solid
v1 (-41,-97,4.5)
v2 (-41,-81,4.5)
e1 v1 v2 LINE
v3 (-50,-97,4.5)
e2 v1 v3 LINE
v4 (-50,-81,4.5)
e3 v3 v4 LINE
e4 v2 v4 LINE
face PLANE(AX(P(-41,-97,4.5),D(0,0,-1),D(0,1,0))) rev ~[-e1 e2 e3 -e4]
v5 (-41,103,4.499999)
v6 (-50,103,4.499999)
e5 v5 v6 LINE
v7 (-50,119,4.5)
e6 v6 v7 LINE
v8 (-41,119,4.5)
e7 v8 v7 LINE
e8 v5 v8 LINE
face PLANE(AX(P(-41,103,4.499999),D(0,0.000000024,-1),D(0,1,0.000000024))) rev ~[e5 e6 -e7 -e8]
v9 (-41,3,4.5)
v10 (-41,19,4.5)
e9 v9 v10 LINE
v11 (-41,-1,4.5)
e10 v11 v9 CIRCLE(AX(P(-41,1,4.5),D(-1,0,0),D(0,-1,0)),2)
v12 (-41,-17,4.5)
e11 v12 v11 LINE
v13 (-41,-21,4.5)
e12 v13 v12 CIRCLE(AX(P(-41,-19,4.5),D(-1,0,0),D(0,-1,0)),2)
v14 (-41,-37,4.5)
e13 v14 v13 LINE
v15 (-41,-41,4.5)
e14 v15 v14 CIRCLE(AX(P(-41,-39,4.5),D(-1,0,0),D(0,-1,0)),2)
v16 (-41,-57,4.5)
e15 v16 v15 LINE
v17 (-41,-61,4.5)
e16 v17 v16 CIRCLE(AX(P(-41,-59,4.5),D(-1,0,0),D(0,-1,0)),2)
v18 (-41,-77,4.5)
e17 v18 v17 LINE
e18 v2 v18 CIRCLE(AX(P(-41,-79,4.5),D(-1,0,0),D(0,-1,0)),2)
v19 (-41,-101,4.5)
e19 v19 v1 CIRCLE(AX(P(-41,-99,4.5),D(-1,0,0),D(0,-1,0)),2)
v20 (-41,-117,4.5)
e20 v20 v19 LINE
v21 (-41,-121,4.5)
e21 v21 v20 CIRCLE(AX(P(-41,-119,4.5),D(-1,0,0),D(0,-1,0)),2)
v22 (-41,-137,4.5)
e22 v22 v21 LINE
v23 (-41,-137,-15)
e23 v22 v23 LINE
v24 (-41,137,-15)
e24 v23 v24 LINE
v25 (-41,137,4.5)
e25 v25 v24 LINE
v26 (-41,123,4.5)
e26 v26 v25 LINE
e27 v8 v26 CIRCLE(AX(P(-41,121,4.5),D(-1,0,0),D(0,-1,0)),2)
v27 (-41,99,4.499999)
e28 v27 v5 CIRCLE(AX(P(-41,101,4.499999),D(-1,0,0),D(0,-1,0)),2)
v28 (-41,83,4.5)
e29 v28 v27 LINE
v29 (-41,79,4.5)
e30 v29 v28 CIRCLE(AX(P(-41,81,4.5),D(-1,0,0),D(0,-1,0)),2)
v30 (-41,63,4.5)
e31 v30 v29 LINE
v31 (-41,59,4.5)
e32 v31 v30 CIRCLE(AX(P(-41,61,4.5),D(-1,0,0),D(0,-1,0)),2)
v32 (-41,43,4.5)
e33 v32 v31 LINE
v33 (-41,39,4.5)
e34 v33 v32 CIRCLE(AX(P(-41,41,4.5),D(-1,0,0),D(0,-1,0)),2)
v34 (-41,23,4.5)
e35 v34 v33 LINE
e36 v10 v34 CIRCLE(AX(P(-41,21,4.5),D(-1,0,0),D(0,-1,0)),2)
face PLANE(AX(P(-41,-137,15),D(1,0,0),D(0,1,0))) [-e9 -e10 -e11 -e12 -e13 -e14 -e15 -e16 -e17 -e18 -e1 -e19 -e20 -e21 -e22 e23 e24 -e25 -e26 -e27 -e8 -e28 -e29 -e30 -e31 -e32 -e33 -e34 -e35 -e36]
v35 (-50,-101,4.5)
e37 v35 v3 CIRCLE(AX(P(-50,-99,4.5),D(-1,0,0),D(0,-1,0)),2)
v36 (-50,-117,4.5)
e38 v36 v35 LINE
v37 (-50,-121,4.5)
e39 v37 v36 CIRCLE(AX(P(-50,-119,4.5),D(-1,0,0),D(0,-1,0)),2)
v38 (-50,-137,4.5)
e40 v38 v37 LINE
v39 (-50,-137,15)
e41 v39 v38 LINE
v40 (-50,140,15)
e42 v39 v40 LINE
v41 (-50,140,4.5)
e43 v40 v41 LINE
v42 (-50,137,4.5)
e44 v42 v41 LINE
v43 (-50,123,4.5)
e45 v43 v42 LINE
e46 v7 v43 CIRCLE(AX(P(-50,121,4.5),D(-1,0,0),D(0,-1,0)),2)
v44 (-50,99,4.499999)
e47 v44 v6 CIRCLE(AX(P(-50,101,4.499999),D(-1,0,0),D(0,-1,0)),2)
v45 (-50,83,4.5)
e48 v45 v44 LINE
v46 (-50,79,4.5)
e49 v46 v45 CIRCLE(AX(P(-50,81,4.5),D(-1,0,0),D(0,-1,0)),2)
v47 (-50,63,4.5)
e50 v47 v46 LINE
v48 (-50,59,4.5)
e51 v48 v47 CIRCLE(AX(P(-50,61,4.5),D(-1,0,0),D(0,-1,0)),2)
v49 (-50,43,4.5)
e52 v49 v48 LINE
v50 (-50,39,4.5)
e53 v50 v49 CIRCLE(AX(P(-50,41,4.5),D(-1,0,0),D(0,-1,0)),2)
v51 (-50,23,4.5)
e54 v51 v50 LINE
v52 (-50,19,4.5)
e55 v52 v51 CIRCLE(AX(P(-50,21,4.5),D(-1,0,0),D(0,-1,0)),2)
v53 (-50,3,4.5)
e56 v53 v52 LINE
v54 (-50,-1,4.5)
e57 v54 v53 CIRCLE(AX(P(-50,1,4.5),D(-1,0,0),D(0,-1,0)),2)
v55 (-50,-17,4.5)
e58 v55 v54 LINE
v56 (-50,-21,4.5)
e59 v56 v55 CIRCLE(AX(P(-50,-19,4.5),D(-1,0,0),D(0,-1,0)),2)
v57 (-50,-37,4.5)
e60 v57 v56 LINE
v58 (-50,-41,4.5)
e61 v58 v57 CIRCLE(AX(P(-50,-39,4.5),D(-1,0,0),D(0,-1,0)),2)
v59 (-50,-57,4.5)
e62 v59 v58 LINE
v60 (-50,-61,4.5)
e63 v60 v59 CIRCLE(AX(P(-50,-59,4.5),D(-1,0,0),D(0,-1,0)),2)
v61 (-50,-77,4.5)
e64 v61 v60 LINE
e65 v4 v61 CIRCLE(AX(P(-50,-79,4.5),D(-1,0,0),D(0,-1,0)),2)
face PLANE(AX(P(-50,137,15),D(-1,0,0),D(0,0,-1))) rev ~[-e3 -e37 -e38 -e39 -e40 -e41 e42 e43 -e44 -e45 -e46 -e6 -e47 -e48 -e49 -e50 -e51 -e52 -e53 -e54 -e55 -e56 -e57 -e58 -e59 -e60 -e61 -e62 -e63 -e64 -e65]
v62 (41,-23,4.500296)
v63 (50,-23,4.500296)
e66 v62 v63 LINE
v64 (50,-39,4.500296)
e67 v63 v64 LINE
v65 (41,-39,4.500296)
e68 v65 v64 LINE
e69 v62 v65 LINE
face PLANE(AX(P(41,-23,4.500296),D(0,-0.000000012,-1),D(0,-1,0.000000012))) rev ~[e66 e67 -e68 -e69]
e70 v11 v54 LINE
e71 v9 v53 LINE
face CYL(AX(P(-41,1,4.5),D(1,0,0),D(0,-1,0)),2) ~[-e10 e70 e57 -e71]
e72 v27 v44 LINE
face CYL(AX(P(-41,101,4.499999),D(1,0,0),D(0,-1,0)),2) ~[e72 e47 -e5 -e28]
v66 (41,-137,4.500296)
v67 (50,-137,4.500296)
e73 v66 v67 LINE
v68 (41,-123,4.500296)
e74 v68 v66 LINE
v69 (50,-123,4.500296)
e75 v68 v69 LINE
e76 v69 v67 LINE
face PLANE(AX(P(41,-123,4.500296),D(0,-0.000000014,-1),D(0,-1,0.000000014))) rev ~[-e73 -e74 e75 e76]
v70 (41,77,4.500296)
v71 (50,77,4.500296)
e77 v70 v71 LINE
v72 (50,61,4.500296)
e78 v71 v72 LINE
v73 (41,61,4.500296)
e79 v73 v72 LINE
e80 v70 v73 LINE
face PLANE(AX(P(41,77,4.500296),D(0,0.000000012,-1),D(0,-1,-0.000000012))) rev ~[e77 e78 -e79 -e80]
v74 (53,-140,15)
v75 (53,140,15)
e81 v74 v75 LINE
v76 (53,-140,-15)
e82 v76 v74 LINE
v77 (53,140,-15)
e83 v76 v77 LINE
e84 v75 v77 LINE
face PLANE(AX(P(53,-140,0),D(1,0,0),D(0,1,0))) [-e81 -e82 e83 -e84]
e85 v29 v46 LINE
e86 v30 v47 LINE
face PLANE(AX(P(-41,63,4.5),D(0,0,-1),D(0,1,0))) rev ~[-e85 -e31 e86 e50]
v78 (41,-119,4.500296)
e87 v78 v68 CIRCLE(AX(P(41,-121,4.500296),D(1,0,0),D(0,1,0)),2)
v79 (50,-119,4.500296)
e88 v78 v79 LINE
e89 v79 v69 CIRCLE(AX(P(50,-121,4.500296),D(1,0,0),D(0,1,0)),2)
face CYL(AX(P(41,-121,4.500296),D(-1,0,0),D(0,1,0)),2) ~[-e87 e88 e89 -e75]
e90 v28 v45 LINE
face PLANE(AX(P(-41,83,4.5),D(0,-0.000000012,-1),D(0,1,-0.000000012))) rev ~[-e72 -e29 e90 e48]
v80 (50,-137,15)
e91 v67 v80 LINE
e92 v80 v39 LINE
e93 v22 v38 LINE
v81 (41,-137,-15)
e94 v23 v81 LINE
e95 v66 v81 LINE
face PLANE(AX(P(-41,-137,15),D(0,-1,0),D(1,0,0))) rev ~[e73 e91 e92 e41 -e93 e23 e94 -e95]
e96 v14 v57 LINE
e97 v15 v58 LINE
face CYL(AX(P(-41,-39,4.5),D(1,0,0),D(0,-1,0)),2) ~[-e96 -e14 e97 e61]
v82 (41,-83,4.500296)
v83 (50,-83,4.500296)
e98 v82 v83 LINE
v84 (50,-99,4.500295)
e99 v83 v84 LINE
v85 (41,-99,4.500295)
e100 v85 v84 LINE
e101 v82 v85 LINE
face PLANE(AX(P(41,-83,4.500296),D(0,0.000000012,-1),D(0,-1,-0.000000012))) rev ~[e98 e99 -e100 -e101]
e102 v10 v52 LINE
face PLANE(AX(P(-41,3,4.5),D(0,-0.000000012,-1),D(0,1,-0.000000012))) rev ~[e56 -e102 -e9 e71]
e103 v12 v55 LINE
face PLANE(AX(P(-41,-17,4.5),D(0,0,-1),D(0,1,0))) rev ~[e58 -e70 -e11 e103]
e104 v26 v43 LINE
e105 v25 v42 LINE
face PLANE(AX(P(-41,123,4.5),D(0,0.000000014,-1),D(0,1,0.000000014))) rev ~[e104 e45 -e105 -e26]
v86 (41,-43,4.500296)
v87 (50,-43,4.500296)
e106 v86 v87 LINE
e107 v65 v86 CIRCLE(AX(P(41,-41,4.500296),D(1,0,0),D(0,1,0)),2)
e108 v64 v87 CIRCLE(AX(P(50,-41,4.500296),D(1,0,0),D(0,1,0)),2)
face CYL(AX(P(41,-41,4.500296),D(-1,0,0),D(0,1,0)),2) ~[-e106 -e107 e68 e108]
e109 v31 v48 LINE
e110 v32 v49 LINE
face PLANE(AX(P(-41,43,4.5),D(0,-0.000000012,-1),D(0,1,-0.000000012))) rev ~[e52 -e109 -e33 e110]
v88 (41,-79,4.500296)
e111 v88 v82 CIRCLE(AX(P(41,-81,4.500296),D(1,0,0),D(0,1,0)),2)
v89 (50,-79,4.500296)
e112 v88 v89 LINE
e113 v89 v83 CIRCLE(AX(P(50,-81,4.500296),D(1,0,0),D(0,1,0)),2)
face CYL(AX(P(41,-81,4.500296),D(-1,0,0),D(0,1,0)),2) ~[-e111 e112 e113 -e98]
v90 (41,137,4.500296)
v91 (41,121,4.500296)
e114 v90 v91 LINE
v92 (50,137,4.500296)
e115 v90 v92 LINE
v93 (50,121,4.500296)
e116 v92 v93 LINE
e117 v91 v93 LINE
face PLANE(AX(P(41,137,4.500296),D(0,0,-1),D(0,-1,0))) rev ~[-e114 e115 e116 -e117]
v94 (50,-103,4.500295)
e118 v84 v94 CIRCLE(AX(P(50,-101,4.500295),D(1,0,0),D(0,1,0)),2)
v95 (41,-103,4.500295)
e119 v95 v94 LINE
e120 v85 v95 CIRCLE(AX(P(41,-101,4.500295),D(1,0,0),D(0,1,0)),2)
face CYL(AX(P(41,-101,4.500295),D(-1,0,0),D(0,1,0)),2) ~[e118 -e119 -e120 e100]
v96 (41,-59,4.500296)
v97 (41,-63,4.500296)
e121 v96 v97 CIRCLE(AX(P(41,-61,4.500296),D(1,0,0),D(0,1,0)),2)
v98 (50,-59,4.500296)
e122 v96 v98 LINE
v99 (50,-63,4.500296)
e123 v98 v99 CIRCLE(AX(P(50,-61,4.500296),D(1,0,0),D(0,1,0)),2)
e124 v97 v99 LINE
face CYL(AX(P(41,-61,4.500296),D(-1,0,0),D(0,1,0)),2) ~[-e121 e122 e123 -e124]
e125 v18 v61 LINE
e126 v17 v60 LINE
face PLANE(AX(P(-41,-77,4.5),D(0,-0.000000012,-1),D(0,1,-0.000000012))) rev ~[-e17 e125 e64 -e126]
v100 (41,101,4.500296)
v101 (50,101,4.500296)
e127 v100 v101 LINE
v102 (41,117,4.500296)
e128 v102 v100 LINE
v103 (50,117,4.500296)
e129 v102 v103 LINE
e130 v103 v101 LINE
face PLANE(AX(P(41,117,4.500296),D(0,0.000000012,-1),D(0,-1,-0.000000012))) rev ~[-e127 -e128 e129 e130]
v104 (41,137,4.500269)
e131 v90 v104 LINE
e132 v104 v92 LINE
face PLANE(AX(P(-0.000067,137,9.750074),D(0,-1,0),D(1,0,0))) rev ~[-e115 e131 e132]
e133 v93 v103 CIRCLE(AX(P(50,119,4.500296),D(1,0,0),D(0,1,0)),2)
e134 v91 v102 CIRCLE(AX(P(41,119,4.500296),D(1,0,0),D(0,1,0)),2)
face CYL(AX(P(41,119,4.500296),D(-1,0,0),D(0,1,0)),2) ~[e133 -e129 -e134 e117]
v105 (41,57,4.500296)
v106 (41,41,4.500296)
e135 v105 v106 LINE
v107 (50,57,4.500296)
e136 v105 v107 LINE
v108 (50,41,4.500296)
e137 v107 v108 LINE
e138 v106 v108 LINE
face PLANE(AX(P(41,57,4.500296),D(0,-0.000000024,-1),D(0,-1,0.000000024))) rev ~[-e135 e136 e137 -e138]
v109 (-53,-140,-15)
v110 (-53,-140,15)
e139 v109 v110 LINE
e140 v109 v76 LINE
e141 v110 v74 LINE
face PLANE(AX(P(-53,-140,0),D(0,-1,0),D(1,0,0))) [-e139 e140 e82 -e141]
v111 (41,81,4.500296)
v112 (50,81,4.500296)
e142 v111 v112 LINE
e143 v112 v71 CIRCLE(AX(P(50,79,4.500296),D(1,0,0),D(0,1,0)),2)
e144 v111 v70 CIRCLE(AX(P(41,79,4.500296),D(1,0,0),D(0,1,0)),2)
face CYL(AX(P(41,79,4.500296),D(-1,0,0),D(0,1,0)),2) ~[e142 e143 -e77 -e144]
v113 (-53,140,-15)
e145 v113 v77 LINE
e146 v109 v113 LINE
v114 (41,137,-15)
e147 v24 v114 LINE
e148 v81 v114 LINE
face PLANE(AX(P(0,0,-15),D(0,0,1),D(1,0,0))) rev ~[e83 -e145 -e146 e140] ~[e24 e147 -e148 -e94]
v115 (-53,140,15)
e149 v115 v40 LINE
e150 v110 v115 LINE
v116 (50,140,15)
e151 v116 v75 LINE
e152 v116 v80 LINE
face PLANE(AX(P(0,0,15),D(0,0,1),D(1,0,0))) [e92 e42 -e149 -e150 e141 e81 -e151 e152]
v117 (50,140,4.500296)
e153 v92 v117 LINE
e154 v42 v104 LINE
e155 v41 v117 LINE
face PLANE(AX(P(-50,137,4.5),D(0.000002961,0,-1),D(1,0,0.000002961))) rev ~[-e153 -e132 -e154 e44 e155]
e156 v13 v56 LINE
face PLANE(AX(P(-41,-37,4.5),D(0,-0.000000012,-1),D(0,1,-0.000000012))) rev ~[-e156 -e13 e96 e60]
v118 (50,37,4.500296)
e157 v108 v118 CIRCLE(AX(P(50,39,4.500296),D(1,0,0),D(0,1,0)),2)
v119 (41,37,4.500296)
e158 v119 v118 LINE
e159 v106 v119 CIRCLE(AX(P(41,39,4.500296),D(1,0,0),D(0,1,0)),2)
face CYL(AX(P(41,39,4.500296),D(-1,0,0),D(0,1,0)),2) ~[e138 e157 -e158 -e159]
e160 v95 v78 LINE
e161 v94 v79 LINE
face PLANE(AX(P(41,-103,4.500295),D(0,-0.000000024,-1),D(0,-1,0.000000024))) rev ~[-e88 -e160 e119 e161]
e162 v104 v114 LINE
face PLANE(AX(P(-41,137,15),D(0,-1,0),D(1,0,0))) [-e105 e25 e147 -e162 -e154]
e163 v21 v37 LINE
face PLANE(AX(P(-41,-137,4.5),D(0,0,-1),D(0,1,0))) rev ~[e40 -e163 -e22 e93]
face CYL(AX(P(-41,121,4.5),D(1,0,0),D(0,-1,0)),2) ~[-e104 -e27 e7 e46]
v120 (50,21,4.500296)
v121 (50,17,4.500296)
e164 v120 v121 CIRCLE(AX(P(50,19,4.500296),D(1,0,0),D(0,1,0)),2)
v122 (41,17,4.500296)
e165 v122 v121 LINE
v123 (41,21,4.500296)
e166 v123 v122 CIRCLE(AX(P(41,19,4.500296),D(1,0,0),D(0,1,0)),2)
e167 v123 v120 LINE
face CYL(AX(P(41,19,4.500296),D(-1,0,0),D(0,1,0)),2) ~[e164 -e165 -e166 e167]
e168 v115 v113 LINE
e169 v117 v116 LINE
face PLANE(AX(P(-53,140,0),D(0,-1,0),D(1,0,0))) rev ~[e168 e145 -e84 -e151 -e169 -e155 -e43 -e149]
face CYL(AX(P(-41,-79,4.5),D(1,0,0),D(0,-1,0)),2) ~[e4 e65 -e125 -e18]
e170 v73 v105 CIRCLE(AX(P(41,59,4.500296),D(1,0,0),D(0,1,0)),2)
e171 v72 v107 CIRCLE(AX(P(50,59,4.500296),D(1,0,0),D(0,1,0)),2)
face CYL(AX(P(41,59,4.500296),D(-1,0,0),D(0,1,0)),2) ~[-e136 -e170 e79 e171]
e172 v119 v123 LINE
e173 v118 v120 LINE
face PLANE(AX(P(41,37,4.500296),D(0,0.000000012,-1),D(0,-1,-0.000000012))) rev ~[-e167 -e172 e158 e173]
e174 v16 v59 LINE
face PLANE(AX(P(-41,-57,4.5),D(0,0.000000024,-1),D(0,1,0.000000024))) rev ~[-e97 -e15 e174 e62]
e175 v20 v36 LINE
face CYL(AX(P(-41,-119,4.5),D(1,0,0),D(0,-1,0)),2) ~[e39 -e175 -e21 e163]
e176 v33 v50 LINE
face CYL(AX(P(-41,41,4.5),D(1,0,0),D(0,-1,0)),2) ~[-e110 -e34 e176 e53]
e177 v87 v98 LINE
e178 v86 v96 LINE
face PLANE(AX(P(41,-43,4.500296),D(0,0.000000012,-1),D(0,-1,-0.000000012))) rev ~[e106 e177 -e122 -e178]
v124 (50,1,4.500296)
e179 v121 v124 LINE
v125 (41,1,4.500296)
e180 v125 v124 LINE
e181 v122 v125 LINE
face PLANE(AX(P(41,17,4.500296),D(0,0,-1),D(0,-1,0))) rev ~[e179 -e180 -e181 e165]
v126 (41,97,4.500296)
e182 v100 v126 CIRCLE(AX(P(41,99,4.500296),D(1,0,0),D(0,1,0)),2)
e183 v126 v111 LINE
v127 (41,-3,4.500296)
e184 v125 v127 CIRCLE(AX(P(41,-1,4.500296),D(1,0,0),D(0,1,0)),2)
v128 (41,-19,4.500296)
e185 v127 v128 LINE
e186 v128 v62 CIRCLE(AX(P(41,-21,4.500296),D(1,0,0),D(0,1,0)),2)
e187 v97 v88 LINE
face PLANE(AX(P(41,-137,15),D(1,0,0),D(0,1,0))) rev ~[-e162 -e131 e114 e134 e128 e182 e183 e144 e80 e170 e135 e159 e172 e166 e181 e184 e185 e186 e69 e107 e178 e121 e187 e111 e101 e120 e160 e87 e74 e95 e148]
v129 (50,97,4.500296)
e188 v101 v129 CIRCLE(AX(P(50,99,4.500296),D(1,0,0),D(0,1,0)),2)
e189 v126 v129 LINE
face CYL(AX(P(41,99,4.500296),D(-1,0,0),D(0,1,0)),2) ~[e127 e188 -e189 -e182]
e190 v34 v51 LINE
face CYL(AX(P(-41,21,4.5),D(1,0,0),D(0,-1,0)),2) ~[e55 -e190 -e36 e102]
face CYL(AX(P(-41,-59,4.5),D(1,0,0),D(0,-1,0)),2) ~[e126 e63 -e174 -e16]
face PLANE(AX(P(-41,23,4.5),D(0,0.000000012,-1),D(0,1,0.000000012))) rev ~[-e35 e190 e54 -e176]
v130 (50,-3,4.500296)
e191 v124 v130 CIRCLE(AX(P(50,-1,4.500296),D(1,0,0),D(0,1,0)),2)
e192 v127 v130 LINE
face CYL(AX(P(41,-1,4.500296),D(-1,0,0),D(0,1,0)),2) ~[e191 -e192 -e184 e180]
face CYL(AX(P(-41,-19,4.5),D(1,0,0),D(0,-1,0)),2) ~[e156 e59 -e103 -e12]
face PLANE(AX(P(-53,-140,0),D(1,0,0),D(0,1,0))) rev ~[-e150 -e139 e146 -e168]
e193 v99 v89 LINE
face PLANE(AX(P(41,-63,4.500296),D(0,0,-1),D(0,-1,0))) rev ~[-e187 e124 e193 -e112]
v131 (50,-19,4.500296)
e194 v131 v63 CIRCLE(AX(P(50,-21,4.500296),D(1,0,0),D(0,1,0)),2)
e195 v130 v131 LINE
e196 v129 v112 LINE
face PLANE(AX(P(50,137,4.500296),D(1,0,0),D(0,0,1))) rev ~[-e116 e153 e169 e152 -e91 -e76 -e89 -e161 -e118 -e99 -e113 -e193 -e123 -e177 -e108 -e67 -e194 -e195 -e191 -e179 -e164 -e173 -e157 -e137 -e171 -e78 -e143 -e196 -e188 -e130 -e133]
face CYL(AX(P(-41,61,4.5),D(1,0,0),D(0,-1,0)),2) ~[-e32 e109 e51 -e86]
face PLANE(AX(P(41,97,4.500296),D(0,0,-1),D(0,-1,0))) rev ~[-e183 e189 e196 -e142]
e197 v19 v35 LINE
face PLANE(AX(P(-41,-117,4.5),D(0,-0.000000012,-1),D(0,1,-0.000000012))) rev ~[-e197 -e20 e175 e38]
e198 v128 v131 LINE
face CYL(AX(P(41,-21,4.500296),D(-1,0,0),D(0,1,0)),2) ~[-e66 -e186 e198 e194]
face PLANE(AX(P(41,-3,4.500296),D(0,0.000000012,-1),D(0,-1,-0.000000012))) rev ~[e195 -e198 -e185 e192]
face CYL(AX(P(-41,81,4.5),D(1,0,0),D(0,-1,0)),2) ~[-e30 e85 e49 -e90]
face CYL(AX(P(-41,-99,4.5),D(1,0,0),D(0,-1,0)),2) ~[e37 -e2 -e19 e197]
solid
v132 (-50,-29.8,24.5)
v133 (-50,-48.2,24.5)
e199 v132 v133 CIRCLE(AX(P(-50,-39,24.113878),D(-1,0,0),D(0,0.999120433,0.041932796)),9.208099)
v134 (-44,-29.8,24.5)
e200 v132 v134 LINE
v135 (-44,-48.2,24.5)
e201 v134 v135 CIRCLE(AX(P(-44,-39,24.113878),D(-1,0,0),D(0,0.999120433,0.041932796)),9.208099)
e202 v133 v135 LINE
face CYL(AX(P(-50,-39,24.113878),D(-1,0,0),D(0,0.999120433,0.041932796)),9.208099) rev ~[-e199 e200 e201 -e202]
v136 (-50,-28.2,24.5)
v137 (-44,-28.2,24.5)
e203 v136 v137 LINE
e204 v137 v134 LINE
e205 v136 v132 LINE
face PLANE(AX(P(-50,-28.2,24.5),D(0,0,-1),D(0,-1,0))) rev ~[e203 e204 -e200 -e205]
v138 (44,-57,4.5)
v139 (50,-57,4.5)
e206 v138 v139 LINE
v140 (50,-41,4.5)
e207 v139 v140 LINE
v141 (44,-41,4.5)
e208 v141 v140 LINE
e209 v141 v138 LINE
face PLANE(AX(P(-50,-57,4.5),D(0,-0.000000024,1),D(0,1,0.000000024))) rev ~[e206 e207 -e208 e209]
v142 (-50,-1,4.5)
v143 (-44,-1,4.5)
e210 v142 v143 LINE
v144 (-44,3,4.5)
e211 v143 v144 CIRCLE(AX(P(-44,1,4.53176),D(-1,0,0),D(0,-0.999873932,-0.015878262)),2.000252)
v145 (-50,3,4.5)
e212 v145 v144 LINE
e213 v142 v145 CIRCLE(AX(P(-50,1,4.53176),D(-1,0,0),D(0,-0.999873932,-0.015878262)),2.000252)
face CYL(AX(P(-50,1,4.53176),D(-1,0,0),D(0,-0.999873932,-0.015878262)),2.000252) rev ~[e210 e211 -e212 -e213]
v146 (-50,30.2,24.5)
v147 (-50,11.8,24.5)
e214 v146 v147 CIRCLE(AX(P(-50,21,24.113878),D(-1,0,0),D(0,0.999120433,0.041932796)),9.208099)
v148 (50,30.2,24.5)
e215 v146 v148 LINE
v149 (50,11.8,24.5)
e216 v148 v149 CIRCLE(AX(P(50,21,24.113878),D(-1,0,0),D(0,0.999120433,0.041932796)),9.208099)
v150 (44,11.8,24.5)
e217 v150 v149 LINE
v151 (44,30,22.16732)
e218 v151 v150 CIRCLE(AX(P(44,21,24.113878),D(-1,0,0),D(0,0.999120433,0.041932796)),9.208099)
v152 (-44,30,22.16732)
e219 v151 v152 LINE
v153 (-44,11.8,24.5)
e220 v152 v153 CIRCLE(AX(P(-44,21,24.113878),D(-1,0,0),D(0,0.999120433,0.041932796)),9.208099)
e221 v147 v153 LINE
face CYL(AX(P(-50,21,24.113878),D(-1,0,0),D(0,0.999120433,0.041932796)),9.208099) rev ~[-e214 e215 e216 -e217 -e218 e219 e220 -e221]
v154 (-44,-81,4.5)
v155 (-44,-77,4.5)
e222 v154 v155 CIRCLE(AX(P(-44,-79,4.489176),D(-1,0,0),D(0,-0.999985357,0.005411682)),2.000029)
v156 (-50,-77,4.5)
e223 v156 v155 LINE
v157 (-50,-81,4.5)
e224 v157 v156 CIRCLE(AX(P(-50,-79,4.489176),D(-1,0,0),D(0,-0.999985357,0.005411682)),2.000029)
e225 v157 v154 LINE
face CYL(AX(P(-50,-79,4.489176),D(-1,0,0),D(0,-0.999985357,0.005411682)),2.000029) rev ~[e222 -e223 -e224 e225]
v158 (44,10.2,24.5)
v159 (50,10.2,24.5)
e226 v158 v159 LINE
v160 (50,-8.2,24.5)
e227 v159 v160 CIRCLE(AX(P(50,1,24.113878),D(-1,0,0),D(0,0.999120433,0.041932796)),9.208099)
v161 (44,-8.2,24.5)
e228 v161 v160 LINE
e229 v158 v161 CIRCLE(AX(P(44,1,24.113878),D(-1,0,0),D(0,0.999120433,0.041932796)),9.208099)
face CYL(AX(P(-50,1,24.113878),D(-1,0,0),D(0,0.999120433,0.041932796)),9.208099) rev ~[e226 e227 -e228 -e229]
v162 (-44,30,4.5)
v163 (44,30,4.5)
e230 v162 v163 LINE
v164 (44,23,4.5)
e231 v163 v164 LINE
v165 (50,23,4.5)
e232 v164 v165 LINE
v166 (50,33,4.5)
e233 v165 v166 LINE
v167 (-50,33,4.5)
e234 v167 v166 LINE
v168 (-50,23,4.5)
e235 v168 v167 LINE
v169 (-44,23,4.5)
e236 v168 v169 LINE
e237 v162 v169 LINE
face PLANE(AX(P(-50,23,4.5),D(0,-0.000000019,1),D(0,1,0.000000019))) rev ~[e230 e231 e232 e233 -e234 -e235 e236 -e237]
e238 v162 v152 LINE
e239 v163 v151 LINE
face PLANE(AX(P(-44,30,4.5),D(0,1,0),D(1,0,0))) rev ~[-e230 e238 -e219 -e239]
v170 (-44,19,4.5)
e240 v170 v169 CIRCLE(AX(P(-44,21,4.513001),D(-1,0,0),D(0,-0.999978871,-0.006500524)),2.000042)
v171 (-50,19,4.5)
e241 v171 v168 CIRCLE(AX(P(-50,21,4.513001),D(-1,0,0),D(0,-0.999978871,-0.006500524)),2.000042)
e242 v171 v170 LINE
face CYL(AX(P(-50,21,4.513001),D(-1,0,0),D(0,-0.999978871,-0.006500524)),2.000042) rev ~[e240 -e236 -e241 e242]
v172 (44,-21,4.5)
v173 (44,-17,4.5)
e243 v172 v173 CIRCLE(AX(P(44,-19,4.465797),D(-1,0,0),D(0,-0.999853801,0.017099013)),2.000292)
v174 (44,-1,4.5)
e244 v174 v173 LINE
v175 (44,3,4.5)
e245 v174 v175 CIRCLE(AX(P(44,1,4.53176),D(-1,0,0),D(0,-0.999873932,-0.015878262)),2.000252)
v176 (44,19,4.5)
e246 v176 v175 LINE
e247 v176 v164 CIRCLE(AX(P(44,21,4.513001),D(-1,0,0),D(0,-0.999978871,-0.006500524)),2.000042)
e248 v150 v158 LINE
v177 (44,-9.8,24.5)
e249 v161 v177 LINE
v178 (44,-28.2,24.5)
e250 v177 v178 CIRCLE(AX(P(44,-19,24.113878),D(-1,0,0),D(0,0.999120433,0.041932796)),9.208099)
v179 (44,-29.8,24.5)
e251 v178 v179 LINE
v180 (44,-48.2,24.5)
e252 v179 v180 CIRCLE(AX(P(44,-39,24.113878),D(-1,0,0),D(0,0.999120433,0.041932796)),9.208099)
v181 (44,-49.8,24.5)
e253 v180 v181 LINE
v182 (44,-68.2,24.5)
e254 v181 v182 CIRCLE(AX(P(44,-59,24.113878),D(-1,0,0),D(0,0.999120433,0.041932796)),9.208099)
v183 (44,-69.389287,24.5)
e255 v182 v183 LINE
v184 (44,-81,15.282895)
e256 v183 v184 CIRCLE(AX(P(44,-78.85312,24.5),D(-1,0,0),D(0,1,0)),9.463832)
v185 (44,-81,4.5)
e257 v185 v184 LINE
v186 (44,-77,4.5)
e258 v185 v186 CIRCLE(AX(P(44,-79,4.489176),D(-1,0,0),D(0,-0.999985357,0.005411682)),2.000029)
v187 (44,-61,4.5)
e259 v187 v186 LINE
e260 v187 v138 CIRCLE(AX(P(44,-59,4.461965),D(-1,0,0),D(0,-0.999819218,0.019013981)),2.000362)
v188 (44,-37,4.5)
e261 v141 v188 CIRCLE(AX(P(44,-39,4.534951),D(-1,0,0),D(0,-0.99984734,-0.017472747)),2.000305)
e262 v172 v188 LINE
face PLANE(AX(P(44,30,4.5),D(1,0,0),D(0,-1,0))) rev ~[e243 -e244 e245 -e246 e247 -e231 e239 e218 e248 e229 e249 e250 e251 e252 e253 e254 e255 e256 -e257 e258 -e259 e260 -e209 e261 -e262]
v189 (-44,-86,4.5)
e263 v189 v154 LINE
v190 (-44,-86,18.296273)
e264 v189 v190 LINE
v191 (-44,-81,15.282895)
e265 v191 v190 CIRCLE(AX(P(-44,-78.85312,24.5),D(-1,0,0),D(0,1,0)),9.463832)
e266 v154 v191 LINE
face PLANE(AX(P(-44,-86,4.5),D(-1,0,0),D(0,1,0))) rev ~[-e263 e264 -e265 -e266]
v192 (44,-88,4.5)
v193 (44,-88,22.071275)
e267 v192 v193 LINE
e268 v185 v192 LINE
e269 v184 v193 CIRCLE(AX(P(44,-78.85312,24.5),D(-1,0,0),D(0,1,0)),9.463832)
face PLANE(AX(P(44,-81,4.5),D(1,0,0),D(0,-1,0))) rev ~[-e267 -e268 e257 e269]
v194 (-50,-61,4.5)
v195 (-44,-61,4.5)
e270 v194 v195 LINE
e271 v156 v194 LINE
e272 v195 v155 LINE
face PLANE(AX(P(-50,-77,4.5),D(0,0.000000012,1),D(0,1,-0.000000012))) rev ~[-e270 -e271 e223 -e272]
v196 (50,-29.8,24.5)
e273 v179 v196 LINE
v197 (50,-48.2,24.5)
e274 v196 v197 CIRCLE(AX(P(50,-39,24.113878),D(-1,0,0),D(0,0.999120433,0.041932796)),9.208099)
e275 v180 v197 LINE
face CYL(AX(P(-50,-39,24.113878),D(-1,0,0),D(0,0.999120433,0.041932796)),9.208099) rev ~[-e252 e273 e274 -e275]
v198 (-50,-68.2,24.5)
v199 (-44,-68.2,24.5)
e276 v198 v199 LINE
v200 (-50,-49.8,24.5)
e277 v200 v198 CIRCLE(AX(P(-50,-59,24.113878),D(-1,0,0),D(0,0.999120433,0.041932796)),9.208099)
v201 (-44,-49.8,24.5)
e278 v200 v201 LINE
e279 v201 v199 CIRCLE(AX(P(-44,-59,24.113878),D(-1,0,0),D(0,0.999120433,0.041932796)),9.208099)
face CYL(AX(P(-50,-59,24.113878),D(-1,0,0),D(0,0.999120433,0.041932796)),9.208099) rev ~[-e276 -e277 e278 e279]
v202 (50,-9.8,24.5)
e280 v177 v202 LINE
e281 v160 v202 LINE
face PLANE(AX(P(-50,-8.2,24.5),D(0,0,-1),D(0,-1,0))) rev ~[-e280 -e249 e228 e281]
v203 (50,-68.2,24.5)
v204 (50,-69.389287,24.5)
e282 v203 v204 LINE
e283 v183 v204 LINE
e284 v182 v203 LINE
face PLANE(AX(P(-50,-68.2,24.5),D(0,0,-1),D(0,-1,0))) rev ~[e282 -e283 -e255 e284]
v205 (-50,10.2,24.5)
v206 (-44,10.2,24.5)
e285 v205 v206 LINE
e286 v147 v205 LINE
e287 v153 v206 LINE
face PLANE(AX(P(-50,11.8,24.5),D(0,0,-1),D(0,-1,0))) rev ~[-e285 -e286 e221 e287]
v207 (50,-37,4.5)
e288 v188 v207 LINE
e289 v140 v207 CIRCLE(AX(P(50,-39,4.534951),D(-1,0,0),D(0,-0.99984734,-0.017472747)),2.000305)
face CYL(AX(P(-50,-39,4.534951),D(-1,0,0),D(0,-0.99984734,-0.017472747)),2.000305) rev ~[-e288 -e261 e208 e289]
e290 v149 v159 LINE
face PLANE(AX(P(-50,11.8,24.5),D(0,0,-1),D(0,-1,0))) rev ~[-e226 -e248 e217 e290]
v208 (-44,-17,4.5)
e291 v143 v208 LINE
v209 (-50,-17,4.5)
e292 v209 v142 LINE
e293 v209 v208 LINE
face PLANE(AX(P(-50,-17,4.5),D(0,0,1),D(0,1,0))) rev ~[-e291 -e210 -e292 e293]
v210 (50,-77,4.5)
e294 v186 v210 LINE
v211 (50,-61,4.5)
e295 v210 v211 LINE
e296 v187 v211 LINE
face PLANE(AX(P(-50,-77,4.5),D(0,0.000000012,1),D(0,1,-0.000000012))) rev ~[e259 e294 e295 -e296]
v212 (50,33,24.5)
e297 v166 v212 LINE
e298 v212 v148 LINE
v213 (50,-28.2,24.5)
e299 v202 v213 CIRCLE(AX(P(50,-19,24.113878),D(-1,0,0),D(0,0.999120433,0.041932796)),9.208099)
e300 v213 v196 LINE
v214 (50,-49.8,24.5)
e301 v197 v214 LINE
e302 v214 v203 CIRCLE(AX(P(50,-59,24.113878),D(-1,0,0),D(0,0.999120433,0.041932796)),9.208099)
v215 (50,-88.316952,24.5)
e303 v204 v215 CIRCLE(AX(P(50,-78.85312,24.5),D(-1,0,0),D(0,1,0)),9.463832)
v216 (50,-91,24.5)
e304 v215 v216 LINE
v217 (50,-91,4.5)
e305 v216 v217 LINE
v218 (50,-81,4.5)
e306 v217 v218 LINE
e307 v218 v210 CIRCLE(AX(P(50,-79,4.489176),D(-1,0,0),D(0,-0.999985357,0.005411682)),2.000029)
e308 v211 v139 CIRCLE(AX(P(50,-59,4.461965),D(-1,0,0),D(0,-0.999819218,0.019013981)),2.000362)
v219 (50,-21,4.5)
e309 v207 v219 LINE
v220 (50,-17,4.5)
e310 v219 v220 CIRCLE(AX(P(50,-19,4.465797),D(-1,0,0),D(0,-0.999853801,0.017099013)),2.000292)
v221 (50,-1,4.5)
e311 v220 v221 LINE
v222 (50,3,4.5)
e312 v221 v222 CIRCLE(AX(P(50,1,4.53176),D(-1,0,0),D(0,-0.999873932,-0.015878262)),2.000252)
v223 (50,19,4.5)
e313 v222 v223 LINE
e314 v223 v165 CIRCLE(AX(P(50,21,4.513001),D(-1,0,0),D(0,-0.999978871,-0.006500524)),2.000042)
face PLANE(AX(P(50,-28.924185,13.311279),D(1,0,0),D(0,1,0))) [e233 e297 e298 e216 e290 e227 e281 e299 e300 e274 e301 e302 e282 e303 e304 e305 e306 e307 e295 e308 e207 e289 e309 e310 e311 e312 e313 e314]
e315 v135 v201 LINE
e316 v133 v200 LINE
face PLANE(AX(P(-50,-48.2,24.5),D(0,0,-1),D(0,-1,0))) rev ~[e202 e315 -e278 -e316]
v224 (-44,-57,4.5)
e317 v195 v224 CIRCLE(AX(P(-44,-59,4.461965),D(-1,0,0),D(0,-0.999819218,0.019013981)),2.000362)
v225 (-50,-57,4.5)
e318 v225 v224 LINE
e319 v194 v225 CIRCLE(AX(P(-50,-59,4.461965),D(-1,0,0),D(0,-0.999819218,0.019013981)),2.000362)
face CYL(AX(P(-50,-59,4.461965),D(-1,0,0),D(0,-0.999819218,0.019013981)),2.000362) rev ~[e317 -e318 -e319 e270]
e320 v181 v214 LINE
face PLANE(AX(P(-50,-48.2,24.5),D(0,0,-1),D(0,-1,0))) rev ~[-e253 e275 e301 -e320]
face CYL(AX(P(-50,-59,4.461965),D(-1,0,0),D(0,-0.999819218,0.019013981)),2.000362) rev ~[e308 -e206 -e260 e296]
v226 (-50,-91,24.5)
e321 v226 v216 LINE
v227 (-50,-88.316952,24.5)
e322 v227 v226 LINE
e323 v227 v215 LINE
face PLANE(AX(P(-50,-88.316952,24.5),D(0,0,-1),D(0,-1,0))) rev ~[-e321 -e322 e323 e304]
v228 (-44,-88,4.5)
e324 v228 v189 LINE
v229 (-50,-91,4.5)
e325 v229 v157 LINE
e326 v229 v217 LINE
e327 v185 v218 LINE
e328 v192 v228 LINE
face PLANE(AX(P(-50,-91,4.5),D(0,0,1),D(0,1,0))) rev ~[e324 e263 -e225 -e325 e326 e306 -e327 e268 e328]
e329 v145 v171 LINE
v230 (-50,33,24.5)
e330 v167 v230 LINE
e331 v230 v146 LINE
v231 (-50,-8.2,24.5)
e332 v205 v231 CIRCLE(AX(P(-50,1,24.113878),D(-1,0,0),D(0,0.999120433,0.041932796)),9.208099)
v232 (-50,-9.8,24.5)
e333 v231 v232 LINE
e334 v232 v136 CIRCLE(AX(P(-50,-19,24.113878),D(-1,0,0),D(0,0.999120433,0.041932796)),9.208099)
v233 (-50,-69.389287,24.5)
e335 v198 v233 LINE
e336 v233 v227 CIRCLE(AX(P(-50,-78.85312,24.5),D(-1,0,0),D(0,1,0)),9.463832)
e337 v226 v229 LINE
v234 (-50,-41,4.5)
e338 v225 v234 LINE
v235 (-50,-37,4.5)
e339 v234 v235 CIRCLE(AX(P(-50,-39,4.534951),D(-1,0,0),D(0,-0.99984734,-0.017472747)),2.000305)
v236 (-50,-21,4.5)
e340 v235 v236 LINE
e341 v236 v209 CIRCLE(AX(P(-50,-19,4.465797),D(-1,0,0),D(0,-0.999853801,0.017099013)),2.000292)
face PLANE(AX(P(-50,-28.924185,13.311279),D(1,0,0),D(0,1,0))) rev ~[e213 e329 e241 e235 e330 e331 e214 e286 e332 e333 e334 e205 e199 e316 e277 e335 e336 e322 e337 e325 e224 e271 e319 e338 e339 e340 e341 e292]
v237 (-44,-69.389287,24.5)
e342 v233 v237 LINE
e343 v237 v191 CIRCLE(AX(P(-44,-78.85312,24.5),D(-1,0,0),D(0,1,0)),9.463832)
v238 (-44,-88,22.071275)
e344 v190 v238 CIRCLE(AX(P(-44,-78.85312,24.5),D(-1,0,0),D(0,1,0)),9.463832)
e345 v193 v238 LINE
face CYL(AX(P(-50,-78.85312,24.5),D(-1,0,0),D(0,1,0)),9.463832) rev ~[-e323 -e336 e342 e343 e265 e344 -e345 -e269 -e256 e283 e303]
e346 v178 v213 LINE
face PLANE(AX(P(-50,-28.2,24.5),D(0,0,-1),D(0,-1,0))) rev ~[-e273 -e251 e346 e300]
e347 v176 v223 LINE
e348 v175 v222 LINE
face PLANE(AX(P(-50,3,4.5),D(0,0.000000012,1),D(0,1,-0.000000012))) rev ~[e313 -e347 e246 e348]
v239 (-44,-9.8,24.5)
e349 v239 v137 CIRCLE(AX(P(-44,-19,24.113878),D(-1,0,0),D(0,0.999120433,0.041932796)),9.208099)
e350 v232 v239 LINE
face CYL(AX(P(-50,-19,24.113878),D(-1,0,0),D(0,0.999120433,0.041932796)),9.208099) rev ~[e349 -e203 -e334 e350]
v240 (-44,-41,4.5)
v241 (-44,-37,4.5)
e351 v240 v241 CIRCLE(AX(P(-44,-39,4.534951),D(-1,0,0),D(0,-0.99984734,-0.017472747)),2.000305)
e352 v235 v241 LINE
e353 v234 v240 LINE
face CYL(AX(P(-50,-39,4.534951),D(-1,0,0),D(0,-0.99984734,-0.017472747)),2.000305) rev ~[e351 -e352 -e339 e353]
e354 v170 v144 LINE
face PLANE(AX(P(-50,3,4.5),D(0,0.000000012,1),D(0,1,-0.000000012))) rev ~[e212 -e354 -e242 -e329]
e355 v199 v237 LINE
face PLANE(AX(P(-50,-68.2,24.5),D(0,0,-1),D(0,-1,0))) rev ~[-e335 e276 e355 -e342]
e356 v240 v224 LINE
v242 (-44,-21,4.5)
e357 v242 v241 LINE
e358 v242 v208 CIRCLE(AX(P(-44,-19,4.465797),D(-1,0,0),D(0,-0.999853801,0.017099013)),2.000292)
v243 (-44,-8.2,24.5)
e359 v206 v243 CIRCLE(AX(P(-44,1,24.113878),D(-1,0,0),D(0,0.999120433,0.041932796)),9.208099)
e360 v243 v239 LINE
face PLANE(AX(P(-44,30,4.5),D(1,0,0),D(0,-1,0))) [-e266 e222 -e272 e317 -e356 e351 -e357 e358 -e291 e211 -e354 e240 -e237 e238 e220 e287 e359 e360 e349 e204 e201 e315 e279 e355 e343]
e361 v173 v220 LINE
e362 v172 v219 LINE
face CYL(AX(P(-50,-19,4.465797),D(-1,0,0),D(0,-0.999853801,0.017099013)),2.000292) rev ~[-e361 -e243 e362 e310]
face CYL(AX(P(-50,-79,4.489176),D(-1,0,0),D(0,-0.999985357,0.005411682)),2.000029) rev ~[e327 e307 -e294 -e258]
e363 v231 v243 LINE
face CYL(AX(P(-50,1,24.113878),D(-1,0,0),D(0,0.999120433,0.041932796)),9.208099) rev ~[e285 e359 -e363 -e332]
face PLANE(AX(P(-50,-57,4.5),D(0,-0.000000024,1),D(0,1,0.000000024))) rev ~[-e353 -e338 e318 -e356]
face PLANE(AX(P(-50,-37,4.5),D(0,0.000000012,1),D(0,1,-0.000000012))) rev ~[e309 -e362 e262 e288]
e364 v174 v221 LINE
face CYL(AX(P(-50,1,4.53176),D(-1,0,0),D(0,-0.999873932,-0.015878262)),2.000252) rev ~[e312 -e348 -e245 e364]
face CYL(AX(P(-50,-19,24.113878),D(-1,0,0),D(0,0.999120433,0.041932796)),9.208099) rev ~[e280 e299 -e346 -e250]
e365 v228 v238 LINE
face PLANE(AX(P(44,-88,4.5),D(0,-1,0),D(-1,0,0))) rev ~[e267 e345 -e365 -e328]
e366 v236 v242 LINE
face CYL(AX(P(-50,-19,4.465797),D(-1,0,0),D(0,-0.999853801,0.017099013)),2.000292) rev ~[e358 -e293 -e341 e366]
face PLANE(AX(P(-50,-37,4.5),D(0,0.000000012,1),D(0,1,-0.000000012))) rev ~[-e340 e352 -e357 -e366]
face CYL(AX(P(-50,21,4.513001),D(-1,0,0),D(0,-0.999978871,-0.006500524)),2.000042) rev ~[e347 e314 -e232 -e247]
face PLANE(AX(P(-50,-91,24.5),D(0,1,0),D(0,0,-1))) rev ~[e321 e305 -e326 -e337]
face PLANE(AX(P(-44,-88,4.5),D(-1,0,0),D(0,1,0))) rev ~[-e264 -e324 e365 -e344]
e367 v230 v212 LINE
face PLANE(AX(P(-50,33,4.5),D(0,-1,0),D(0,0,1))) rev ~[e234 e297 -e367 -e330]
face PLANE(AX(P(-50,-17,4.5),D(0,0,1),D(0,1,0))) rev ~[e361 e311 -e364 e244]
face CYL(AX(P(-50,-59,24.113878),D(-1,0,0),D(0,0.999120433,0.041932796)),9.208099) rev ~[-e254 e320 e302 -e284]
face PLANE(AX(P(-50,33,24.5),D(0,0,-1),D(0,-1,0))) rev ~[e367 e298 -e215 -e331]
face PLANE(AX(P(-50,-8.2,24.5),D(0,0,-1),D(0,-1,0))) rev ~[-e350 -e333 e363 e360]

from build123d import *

# Parameters (mm, degrees)
F0_W      = 106
F0_H      = 280
F1_DEPTH  = 15
F2_W      = 82
F2_H      = 274
F3_DEPTH  = 39
F6_DEPTH  = 9
F7_DEPTH  = 9
F9_DEPTH  = 25
F11_DEPTH = 100
F12_W     = 88.0000000032
F12_H     = 111
F13_DEPTH = 25


# Not quite as in the source:
# - ends of sketch curves that miss each other by under 0.0002 mm in the source are joined


with BuildPart() as f1:
    # F0 (on Top) → F1 (new body, symmetric)
    with BuildSketch(Plane.XY):
        Rectangle(F0_W, F0_H)
    extrude(amount=F1_DEPTH, both=True)

    # F2 (on face) → F3 (cut)
    with BuildSketch(Plane.XY.offset(15)):
        Rectangle(F2_W, F2_H)
    extrude(amount=-F3_DEPTH, mode=Mode.SUBTRACT)

    # F4 (on face) → F6 (cut)
    with BuildSketch(Plane.YZ.offset(-41)):
        with BuildLine():
            Line((137, 15), (-137, 15))
            Line((-137, 15), (-137, 4.5))
            Line((-137, 4.5), (-121, 4.5))
            ThreePointArc((-121, 4.5), (-119, 6.5), (-117, 4.5))
            Line((-117, 4.5), (-101, 4.4999998063))
            ThreePointArc((-101, 4.4999998063), (-99, 6.4999998063), (-97, 4.4999998063))
            Line((-97, 4.4999998063), (-81, 4.4999998063))
            ThreePointArc((-81, 4.4999998063), (-79, 6.4999998063), (-77, 4.4999998063))
            Line((-77, 4.4999998063), (-61, 4.4999996126))
            ThreePointArc((-61, 4.4999996126), (-59, 6.4999996126), (-57, 4.4999996126))
            Line((-57, 4.4999996126), (-41.0000000298, 4.5))
            ThreePointArc((-41.0000000298, 4.5), (-39.0000000298, 6.5), (-37.0000000298, 4.5))
            Line((-37.0000000298, 4.5), (-21.0000000298, 4.4999998063))
            ThreePointArc((-21.0000000298, 4.4999998063), (-19.0000000298, 6.4999998063), (-17.0000000298, 4.4999998063))
            Line((-17.0000000298, 4.4999998063), (-1.0000000298, 4.4999998063))
            ThreePointArc((-1.0000000298, 4.4999998063), (0.9999999702, 6.4999998063), (2.9999999702, 4.4999998063))
            Line((2.9999999702, 4.4999998063), (18.9999999702, 4.4999996126))
            ThreePointArc((18.9999999702, 4.4999996126), (20.9999999702, 6.4999996126), (22.9999999702, 4.4999996126))
            Line((22.9999999702, 4.4999996126), (38.9999999702, 4.4999998063))
            ThreePointArc((38.9999999702, 4.4999998063), (40.9999999702, 6.4999998063), (42.9999999702, 4.4999998063))
            Line((42.9999999702, 4.4999998063), (58.9999999702, 4.4999996126))
            ThreePointArc((58.9999999702, 4.4999996126), (60.9999999702, 6.4999996126), (62.9999999702, 4.4999996126))
            Line((62.9999999702, 4.4999996126), (78.9999999702, 4.4999996126))
            ThreePointArc((78.9999999702, 4.4999996126), (80.9999999702, 6.4999996126), (82.9999999702, 4.4999996126))
            Line((82.9999999702, 4.4999996126), (98.9999999702, 4.4999994189))
            ThreePointArc((98.9999999702, 4.4999994189), (100.9999999702, 6.4999994189), (102.9999999702, 4.4999994189))
            Line((102.9999999702, 4.4999994189), (118.9999999404, 4.4999998063))
            ThreePointArc((118.9999999404, 4.4999998063), (120.9999999404, 6.4999998063), (122.9999999404, 4.4999998063))
            Line((122.9999999404, 4.4999998063), (137, 4.5))
            Line((137, 4.5), (137, 15))
        make_face()
    extrude(amount=-F6_DEPTH, mode=Mode.SUBTRACT)

    # F5 (on face) → F7 (cut)
    with BuildSketch(Plane(origin=(41, 0, 0), x_dir=(0, -1, 0), z_dir=(-1, 0, 0))):
        with BuildLine():
            Line((137, 4.5002960662), (137, 15))
            Line((137, 15), (-137, 15))
            Line((-137, 15), (-137, 4.5002960662))
            Line((-137, 4.5002960662), (-121, 4.5002960662))
            ThreePointArc((-121, 4.5002960662), (-119, 6.5002960662), (-117, 4.5002960662))
            Line((-117, 4.5002960662), (-101, 4.5002958725))
            ThreePointArc((-101, 4.5002958725), (-99, 6.5002958725), (-97, 4.5002958725))
            Line((-97, 4.5002958725), (-81, 4.5002958725))
            ThreePointArc((-81, 4.5002958725), (-79, 6.5002958725), (-77, 4.5002958725))
            Line((-77, 4.5002958725), (-61, 4.5002956788))
            ThreePointArc((-61, 4.5002956788), (-59, 6.5002956788), (-57, 4.5002956788))
            Line((-57, 4.5002956788), (-41.0000000298, 4.5002960662))
            ThreePointArc((-41.0000000298, 4.5002960662), (-39.0000000298, 6.5002960662), (-37.0000000298, 4.5002960662))
            Line((-37.0000000298, 4.5002960662), (-21.0000000298, 4.5002958725))
            ThreePointArc((-21.0000000298, 4.5002958725), (-19.0000000298, 6.5002958725), (-17.0000000298, 4.5002958725))
            Line((-17.0000000298, 4.5002958725), (-1.0000000298, 4.5002958725))
            ThreePointArc((-1.0000000298, 4.5002958725), (0.9999999702, 6.5002958725), (2.9999999702, 4.5002958725))
            Line((2.9999999702, 4.5002958725), (18.9999999702, 4.5002956788))
            ThreePointArc((18.9999999702, 4.5002956788), (20.9999999702, 6.5002956788), (22.9999999702, 4.5002956788))
            Line((22.9999999702, 4.5002956788), (38.9999999702, 4.5002958725))
            ThreePointArc((38.9999999702, 4.5002958725), (40.9999999702, 6.5002958725), (42.9999999702, 4.5002958725))
            Line((42.9999999702, 4.5002958725), (58.9999999702, 4.5002956788))
            ThreePointArc((58.9999999702, 4.5002956788), (60.9999999702, 6.5002956788), (62.9999999702, 4.5002956788))
            Line((62.9999999702, 4.5002956788), (78.9999999702, 4.5002956788))
            ThreePointArc((78.9999999702, 4.5002956788), (80.9999999702, 6.5002956788), (82.9999999702, 4.5002956788))
            Line((82.9999999702, 4.5002956788), (98.9999999702, 4.5002954851))
            ThreePointArc((98.9999999702, 4.5002954851), (100.9999999702, 6.5002954851), (102.9999999702, 4.5002954851))
            Line((102.9999999702, 4.5002954851), (118.9999999404, 4.5002958725))
            ThreePointArc((118.9999999404, 4.5002958725), (120.9999999404, 6.5002958725), (122.9999999404, 4.5002958725))
            Line((122.9999999404, 4.5002958725), (137, 4.5002960662))
        make_face()
    extrude(amount=-F7_DEPTH, mode=Mode.SUBTRACT)

    # F8 (on face) → F9 (cut)
    with BuildSketch(Plane.XZ.offset(-137)):
        Polygon((50, 15), (-50, 15), (-50, 4.5), (50, 4.5002960662), align=None)
    extrude(amount=-F9_DEPTH, mode=Mode.SUBTRACT)


with BuildPart() as f11:
    # F10 (on face) → F11 (new body, through all)
    with BuildSketch(Plane.YZ.offset(-50)):
        with BuildLine():
            ThreePointArc((-81, 4.4999998063), (-79, 6.4892055712), (-77, 4.4999998063))
            Line((-77, 4.4999998063), (-61, 4.4999996126))
            ThreePointArc((-61, 4.4999996126), (-59, 6.462326405), (-57, 4.4999996126))
            Line((-57, 4.4999996126), (-41.0000000298, 4.5))
            ThreePointArc((-41.0000000298, 4.5), (-39.0000000298, 6.5352561957), (-37.0000000298, 4.5))
            Line((-37.0000000298, 4.5), (-21.0000000298, 4.4999998063))
            ThreePointArc((-21.0000000298, 4.4999998063), (-19.0000000298, 6.4660892193), (-17.0000000298, 4.4999998063))
            Line((-17.0000000298, 4.4999998063), (-1.0000000298, 4.4999998063))
            ThreePointArc((-1.0000000298, 4.4999998063), (0.9999999702, 6.5320125012), (2.9999999702, 4.4999998063))
            Line((2.9999999702, 4.4999998063), (18.9999999702, 4.4999996126))
            ThreePointArc((18.9999999702, 4.4999996126), (20.9999999702, 6.5130431925), (22.9999999702, 4.4999996126))
            Line((22.9999999702, 4.4999996126), (32.9999999702, 4.4999998063))
            Line((32.9999999702, 4.4999998063), (32.9999999702, 24.4999998063))
            Line((32.9999999702, 24.4999998063), (31.7999999702, 24.4999998063))
            Line((31.7999999702, 24.4999998063), (30.1999999702, 24.4999998063))
            ThreePointArc((30.1999999702, 24.4999998063), (20.9999999702, 14.9057793253), (11.7999999702, 24.4999998063))
            Line((11.7999999702, 24.4999998063), (10.1999999702, 24.4999998063))
            ThreePointArc((10.1999999702, 24.4999998063), (0.9999999702, 14.9057793253), (-8.2000000298, 24.4999998063))
            Line((-8.2000000298, 24.4999998063), (-9.8000000298, 24.4999998063))
            ThreePointArc((-9.8000000298, 24.4999998063), (-19.0000000298, 14.9057793253), (-28.2000000298, 24.4999998063))
            Line((-28.2000000298, 24.4999998063), (-29.8000000298, 24.4999998063))
            ThreePointArc((-29.8000000298, 24.4999998063), (-39.0000000298, 14.9057793253), (-48.2000000298, 24.4999998063))
            Line((-48.2000000298, 24.4999998063), (-49.8, 24.4999998063))
            ThreePointArc((-49.8, 24.4999998063), (-59, 14.9057793253), (-68.2, 24.4999998063))
            Line((-68.2, 24.4999998063), (-69.3892873049, 24.4999998063))
            ThreePointArc((-69.3892873049, 24.4999998063), (-78.8531196296, 15.0361674815), (-88.3169519544, 24.4999998063))
            Line((-88.3169519544, 24.4999998063), (-89.9169519544, 24.4999998063))
            Line((-89.9169519544, 24.4999998063), (-91, 24.4999998063))
            Line((-91, 24.4999998063), (-91, 4.4999998063))
            Line((-91, 4.4999998063), (-81, 4.4999998063))
        make_face()
    extrude(amount=F11_DEPTH)

    # F12 (on face) → F13 (cut)
    with BuildSketch(Plane(origin=(0, 0, 4.4999998063), x_dir=(1, 0, 0), z_dir=(0, 0, -1))):
        with Locations((1.7e-09, 25.5)):
            Rectangle(F12_W, F12_H)
        Polygon((-44, 88), (-44, 86), (-43.9999999999, 81), (44.0000000017, 81), (44.0000000017, 86), (44.0000000017, 88), align=None)
    extrude(amount=-F13_DEPTH, mode=Mode.SUBTRACT)


solid = Compound([f1.part, f11.part])
